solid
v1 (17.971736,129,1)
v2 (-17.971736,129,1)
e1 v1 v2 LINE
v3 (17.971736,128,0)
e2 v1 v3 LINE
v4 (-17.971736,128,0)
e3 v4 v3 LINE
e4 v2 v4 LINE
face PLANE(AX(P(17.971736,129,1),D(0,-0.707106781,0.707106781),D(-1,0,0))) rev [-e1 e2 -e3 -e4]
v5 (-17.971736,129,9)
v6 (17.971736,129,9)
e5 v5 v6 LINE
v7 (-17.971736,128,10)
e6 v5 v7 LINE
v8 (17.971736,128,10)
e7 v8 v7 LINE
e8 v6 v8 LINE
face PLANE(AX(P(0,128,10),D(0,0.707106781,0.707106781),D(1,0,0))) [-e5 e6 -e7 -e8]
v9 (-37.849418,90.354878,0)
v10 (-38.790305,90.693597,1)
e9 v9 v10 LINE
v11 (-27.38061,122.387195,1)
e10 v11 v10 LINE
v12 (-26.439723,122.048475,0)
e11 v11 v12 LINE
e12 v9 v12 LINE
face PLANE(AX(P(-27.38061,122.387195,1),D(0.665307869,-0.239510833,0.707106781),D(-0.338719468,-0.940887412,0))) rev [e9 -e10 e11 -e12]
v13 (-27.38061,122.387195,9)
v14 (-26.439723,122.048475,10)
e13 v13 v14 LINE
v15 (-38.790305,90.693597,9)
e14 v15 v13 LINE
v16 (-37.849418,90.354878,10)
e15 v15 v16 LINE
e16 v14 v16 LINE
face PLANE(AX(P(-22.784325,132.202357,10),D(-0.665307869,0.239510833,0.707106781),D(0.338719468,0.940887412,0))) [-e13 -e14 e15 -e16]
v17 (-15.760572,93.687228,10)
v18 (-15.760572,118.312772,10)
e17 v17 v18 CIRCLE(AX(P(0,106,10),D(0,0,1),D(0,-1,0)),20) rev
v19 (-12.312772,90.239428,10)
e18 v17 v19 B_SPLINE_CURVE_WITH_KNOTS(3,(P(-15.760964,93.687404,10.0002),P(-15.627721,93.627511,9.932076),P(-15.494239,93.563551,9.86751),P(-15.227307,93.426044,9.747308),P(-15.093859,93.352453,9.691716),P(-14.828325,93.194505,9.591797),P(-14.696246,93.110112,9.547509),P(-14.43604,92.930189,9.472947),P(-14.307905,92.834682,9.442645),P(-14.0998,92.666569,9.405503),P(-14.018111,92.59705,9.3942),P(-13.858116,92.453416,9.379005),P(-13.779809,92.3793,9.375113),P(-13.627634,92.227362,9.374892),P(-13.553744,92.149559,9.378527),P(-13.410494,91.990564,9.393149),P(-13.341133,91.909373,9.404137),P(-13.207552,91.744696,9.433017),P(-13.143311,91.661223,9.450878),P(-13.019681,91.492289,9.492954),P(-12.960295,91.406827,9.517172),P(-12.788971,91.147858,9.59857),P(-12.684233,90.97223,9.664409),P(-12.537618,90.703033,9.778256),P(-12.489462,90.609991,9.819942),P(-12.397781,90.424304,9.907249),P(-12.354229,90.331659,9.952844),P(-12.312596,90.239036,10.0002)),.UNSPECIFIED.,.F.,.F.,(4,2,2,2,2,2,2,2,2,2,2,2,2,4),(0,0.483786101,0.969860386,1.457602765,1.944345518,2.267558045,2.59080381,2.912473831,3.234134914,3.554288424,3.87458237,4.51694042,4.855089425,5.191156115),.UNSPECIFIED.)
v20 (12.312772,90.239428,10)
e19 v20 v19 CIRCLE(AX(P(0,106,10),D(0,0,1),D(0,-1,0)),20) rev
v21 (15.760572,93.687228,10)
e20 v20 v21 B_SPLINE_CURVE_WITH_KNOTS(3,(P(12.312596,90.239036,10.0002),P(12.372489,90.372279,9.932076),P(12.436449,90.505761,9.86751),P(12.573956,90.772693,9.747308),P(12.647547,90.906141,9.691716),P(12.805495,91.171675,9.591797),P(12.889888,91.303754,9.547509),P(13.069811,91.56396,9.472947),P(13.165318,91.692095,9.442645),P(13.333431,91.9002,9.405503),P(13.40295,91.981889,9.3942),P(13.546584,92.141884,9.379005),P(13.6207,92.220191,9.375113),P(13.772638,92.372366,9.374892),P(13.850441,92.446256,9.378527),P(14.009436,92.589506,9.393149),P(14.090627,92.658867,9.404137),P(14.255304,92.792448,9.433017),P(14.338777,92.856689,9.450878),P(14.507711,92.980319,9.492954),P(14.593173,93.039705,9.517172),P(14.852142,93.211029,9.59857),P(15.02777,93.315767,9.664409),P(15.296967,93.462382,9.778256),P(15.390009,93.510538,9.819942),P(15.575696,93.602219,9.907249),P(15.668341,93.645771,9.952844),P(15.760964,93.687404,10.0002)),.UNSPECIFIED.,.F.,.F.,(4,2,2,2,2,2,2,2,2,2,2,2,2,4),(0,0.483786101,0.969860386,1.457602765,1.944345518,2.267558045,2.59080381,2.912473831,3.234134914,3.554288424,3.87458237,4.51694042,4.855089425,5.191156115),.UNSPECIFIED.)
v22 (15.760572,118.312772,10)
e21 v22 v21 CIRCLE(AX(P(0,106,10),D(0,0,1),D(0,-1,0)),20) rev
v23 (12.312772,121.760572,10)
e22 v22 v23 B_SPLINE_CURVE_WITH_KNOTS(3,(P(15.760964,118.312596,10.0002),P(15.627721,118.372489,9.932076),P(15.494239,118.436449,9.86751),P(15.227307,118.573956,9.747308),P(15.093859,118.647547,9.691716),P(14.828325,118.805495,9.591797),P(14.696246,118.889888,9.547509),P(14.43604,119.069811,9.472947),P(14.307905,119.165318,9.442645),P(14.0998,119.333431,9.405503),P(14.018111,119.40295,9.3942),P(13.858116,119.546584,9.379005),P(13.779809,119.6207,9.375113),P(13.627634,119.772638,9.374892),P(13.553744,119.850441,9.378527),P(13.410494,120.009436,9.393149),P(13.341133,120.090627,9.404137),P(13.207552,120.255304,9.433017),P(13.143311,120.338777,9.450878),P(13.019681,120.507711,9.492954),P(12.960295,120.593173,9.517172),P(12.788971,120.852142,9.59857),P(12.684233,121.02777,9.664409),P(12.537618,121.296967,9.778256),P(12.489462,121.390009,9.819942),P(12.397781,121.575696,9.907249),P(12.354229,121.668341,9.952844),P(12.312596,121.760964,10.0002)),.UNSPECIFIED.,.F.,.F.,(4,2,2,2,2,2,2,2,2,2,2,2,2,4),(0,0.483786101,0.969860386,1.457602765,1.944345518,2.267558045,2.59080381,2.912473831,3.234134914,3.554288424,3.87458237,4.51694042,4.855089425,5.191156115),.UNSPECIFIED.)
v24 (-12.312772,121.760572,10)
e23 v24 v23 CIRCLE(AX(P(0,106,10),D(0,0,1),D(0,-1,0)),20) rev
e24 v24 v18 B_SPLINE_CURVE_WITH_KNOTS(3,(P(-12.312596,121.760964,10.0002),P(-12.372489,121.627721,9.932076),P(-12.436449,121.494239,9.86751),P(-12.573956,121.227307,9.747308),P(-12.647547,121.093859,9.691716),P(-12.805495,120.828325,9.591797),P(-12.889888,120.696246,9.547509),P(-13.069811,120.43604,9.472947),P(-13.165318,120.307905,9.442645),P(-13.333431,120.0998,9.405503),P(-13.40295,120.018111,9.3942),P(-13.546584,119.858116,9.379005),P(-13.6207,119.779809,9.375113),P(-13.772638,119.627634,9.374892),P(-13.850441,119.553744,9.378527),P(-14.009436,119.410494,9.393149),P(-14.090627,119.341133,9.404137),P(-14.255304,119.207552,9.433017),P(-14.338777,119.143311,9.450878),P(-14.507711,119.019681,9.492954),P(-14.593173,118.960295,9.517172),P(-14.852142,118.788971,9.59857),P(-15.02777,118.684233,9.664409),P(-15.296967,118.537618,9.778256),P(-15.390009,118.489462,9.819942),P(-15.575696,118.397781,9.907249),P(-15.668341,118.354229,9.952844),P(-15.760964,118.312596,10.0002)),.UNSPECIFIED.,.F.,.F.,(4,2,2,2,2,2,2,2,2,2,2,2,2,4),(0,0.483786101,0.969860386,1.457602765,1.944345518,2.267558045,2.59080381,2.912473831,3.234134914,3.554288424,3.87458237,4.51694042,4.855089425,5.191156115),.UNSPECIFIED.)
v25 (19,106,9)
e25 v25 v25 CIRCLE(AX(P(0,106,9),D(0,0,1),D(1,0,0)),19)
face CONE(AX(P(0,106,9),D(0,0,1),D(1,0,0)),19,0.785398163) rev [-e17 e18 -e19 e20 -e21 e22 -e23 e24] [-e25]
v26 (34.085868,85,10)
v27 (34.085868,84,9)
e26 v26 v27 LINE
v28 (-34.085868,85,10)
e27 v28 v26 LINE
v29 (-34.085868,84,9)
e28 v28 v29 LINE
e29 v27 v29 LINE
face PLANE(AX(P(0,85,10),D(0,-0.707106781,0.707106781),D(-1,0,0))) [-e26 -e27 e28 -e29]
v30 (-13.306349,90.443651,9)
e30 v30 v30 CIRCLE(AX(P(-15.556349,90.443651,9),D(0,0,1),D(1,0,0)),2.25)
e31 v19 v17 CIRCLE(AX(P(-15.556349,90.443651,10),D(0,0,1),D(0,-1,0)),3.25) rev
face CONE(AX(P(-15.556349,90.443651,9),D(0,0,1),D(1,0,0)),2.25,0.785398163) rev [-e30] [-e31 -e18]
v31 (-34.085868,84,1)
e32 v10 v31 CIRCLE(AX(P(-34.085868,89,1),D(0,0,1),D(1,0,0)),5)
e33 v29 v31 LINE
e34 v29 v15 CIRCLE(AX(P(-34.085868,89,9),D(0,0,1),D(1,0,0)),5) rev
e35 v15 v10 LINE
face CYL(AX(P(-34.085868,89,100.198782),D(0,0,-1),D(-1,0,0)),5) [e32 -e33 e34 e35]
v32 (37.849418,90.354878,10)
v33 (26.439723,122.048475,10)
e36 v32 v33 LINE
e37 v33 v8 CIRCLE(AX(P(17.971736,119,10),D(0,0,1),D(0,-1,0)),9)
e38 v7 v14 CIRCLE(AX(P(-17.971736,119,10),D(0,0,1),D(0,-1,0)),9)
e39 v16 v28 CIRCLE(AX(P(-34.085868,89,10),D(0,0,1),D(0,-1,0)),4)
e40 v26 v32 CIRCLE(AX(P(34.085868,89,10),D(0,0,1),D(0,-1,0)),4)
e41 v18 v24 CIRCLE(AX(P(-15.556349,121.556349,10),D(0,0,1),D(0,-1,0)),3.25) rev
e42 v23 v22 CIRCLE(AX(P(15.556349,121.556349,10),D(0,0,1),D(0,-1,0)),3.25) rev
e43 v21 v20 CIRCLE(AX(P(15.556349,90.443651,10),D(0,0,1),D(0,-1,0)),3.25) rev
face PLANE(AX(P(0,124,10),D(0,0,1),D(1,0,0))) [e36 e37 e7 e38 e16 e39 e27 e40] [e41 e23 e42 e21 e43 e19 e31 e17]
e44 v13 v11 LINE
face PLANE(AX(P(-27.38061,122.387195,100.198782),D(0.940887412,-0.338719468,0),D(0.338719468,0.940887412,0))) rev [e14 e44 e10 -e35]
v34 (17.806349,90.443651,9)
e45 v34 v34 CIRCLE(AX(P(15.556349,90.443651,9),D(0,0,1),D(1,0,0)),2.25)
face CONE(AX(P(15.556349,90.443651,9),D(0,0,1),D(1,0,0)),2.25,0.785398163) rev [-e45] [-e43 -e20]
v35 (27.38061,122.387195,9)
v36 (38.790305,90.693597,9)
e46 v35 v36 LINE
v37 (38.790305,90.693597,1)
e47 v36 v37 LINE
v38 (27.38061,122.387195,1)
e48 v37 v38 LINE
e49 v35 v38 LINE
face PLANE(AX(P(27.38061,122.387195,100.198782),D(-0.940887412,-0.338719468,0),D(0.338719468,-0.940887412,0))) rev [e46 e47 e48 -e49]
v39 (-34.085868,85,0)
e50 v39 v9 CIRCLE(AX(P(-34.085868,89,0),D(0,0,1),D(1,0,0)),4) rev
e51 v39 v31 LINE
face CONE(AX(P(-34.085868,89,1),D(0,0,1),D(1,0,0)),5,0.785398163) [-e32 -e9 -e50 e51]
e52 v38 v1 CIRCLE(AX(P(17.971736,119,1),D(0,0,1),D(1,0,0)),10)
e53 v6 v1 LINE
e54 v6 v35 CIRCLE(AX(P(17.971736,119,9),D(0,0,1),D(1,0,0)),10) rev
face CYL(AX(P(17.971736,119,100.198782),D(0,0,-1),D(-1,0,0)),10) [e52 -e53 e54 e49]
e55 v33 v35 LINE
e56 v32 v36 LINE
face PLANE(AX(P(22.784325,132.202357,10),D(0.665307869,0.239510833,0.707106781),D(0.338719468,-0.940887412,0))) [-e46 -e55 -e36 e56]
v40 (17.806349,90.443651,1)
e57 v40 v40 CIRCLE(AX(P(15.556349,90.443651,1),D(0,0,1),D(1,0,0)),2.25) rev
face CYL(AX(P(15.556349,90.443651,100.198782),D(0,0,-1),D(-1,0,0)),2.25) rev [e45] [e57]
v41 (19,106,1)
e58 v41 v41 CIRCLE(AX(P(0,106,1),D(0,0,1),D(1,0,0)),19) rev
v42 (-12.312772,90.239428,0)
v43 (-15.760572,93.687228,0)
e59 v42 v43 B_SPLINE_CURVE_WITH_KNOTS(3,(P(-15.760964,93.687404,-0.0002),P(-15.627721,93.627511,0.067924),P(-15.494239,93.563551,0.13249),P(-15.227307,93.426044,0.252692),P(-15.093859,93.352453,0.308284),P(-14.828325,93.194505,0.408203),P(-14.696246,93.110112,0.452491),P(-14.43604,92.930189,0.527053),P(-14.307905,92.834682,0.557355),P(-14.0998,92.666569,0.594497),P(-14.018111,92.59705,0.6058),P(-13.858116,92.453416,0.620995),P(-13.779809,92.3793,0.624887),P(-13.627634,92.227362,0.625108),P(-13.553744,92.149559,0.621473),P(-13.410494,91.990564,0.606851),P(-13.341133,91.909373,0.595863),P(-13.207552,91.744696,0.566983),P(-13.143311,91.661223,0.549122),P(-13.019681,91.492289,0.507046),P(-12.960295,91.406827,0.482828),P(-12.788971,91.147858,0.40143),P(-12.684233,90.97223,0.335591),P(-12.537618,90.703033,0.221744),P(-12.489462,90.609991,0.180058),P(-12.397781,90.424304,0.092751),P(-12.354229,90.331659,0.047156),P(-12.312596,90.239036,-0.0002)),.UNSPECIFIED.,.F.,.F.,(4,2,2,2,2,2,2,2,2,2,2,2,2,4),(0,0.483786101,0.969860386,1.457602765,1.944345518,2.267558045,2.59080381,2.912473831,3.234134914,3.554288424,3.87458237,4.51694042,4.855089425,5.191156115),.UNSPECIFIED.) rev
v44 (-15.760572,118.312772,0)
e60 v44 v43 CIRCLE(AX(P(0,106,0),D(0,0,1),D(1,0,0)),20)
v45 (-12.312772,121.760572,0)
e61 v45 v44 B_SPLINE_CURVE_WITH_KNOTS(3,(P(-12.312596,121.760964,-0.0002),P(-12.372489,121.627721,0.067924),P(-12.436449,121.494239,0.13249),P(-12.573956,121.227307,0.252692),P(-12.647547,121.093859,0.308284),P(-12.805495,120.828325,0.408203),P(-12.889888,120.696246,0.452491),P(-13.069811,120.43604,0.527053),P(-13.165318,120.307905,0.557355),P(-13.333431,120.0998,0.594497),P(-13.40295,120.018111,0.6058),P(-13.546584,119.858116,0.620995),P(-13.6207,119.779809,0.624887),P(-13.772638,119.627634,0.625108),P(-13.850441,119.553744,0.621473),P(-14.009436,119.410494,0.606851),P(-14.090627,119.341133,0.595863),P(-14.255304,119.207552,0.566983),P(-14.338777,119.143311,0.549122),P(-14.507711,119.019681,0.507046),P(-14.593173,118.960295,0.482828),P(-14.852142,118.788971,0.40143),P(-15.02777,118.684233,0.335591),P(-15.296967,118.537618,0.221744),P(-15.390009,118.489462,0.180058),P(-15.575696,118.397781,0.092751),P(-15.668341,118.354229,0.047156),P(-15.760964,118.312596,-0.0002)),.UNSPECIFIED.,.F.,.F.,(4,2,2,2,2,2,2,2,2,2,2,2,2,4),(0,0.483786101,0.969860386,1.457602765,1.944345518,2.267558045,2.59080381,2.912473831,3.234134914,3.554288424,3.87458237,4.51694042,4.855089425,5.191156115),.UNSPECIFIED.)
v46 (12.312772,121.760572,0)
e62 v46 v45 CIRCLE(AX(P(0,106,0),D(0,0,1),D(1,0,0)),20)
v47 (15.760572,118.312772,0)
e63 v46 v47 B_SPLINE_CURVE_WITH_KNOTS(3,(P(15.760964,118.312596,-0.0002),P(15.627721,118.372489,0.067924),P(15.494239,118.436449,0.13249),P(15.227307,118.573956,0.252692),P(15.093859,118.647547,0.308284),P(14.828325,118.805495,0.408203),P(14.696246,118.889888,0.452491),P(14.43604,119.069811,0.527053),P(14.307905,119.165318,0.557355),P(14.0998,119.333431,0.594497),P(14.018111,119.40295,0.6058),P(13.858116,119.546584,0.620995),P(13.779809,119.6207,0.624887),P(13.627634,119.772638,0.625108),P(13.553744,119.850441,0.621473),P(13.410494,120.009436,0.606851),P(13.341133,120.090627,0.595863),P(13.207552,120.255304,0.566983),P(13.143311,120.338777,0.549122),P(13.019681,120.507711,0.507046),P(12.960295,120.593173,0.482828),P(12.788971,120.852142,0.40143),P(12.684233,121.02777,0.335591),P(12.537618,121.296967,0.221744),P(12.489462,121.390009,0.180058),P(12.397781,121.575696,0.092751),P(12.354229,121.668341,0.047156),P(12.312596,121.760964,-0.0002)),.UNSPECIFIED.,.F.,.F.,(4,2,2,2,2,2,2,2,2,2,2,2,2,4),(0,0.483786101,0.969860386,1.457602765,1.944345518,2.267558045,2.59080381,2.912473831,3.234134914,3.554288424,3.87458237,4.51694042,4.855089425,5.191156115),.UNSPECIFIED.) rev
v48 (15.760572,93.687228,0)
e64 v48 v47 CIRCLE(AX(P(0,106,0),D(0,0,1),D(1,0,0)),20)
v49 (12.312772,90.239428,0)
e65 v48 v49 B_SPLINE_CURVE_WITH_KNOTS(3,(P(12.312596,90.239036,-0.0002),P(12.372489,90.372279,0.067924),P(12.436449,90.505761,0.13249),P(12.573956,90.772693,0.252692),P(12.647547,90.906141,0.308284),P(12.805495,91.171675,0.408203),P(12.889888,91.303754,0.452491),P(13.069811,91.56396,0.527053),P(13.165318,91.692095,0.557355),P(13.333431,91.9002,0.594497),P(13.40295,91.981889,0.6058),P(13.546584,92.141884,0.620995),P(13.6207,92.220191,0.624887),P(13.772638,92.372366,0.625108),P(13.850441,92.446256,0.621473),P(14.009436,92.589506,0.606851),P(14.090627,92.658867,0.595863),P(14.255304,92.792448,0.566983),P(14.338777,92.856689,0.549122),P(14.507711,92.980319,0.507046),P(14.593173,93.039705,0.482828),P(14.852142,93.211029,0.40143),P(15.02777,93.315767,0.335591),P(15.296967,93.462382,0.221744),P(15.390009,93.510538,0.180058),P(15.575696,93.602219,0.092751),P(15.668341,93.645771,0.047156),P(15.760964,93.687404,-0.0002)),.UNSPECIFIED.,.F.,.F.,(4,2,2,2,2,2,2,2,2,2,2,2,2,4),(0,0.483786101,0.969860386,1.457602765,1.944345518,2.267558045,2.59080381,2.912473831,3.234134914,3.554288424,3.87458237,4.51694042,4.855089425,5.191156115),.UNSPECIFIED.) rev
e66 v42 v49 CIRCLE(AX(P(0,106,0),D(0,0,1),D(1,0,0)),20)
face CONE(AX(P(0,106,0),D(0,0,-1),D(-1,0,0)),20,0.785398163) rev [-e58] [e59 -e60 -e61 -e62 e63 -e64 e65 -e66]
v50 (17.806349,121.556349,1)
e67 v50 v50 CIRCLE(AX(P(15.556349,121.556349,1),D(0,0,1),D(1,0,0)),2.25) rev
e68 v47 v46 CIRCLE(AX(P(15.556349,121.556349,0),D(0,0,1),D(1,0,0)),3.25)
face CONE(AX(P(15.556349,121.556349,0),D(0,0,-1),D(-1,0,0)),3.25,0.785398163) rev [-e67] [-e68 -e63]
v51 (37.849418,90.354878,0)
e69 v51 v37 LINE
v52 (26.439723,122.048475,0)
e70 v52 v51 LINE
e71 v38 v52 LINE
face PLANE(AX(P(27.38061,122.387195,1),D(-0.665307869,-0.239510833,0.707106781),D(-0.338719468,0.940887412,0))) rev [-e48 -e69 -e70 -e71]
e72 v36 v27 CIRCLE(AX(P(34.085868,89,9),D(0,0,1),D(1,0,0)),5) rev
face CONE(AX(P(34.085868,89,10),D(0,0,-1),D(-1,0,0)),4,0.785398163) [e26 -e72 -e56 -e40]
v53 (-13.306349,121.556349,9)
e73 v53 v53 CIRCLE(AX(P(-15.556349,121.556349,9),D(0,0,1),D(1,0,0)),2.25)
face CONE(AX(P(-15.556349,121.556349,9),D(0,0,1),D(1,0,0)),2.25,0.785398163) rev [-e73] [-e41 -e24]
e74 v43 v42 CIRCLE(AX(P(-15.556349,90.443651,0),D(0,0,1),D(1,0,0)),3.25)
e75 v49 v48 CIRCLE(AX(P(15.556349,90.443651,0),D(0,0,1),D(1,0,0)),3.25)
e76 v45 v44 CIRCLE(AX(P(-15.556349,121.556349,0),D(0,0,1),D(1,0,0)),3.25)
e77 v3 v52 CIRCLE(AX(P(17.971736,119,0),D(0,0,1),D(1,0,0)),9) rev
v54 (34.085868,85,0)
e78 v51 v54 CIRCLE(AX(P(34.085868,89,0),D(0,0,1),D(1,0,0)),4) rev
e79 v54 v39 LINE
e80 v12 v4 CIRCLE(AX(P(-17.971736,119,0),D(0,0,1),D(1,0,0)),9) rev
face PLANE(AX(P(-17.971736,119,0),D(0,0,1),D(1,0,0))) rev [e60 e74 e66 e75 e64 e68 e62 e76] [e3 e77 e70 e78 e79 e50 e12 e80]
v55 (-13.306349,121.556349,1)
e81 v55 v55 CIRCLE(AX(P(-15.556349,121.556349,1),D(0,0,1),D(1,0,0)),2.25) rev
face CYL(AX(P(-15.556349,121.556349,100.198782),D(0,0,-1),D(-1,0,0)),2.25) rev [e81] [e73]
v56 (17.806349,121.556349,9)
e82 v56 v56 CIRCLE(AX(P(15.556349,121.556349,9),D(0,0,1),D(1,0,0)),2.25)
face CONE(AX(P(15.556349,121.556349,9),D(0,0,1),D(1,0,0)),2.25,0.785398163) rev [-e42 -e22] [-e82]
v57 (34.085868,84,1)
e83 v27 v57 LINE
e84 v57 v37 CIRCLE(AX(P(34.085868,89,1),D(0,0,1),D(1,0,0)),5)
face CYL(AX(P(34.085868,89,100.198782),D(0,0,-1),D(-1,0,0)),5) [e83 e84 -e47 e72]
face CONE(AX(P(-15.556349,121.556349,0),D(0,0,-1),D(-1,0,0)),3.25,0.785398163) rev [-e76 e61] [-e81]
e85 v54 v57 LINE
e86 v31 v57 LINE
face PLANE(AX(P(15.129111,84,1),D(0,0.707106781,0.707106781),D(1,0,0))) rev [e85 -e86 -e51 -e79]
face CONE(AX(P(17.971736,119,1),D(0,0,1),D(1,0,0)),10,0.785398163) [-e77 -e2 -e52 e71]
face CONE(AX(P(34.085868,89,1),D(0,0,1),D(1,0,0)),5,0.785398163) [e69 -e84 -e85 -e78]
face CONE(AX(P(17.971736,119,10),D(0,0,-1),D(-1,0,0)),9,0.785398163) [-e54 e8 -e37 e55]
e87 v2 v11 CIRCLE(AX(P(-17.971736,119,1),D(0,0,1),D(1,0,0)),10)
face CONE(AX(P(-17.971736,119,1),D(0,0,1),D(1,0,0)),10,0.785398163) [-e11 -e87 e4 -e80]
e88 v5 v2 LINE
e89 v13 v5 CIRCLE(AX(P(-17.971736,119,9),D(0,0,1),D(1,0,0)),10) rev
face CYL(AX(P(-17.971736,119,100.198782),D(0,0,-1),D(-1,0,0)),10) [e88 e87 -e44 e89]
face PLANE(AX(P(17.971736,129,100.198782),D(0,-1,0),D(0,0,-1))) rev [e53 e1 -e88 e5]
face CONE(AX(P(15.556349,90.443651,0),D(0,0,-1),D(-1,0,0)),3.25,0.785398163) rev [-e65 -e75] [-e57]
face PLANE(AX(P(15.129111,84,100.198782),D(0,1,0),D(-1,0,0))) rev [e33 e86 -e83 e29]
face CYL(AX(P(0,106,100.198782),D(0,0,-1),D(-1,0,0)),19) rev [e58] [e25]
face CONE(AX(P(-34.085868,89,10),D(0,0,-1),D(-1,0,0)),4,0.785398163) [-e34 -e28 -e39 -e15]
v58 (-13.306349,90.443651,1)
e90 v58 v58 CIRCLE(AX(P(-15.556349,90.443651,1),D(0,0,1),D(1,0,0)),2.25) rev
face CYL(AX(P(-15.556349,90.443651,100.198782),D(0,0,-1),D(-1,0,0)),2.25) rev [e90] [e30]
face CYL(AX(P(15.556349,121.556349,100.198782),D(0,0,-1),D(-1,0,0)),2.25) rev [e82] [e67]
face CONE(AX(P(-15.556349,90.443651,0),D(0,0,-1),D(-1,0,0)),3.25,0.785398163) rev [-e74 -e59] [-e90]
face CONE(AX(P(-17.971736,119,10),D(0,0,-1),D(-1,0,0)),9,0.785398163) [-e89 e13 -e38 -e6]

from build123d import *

# Parameters (mm, degrees)
SKETCH1_R           = 19
SKETCH1_R_2         = 2.25
BOSS_EXTRUDE1_DEPTH = 10
CHAMFER1_SIZE       = 1


with BuildPart() as part:
    # Sketch1 → Boss-Extrude1 (new body)
    with BuildSketch(Plane.XY):
        with BuildLine():
            Line((-27.380609914, 122.387194683), (-38.790304957, 90.693597341))
            ThreePointArc((-38.790304957, 90.693597341), (-38.176588293, 86.124933627), (-34.085867898, 84))
            Line((-34.085867898, 84), (-15.12911101, 84))
            Line((-15.12911101, 84), (15.12911101, 84))
            Line((15.12911101, 84), (34.085867898, 84))
            ThreePointArc((34.085867898, 84), (38.176588293, 86.124933627), (38.790304957, 90.693597341))
            Line((38.790304957, 90.693597341), (27.380609914, 122.387194683))
            ThreePointArc((27.380609914, 122.387194683), (23.721868541, 127.181440791), (17.971735796, 129))
            Line((17.971735796, 129), (-17.971735796, 129))
            ThreePointArc((-17.971735796, 129), (-23.721868541, 127.181440791), (-27.380609914, 122.387194683))
        make_face()
        with Locations(Location((0, 106, 0), (0, 0, 270))):
            Circle(SKETCH1_R, mode=Mode.SUBTRACT)
        with Locations(Location((15.556349182, 90.443650818, 0), (0, 0, 270))):
            Circle(SKETCH1_R_2, mode=Mode.SUBTRACT)
        with Locations(Location((-15.556349182, 90.443650818, 0), (0, 0, 270))):
            Circle(SKETCH1_R_2, mode=Mode.SUBTRACT)
        with Locations(Location((15.556349182, 121.556349182, 0), (0, 0, 270))):
            Circle(SKETCH1_R_2, mode=Mode.SUBTRACT)
        with Locations(Location((-15.556349182, 121.556349182, 0), (0, 0, 270))):
            Circle(SKETCH1_R_2, mode=Mode.SUBTRACT)
    extrude(amount=BOSS_EXTRUDE1_DEPTH)

    # Chamfer1
    # the kernel refuses this chamfer: 1 mm, written as the material it takes off along each edge
    with BuildSketch(Plane(origin=(17.971735796, 129, 0), x_dir=(0, 0.027495876610582174, 0.9996219169112968), z_dir=(-1, 0, 0)), Plane(origin=(17.971735796, 129, 10), x_dir=(0, -0.9996219169112968, 0.02749587661058574), z_dir=(-1, 0, 0))) as chamfer1_piece_1:
        Polygon((CHAMFER1_SIZE * 0.999621916911, -CHAMFER1_SIZE * 0.0274958766106), (-CHAMFER1_SIZE * 0.0274958766106, -CHAMFER1_SIZE * 0.999621916911), (0, 0), align=None)
    extrude(amount=35.943471591, mode=Mode.SUBTRACT)
    with BuildSketch(Plane(origin=(17.971735796, 119, 0), x_dir=(0.9408874118687268, 0.33871946827274174, 0), z_dir=(0.33871946827274174, -0.9408874118687268, 0))) as chamfer1_piece_2:
        Polygon((10, CHAMFER1_SIZE), (10 - CHAMFER1_SIZE, 0), (10, 0), align=None)
    revolve(axis=Axis((17.971735796, 119, 0), (0, 0, 1)), revolution_arc=70.201123645, mode=Mode.SUBTRACT)
    with BuildSketch(Plane(origin=(38.790304957, 90.693597341, 0), x_dir=(0.025870524181196484, 0.009313388705230746, 0.9996219169112968), z_dir=(-0.3387194682727421, 0.9408874118687267, 0)), Plane(origin=(-27.380609914, 122.387194683, 0), x_dir=(-0.025870524181196484, 0.00931338870523073, 0.9996219169112968), z_dir=(-0.3387194682727416, -0.9408874118687268, 0)), Plane(origin=(38.790304957, 90.693597341, 10), x_dir=(-0.9405316782499255, -0.33859140416997363, 0.027495876610585557), z_dir=(-0.3387194682727421, 0.9408874118687267, 0))) as chamfer1_piece_3:
        Polygon((CHAMFER1_SIZE * 0.999621916911, -CHAMFER1_SIZE * 0.0274958766106), (-CHAMFER1_SIZE * 0.0274958766106, -CHAMFER1_SIZE * 0.999621916911), (0, 0), align=None)
    extrude(amount=33.684792613, mode=Mode.SUBTRACT)
    with BuildSketch(Plane(origin=(34.085867898, 89, 0), x_dir=(0, -1, 0), z_dir=(-1, 0, 0))) as chamfer1_piece_4:
        Polygon((5, CHAMFER1_SIZE), (5 - CHAMFER1_SIZE, 0), (5, 0), align=None)
    revolve(axis=Axis((34.085867898, 89, 0), (0, 0, 1)), revolution_arc=109.798876355, mode=Mode.SUBTRACT)
    with BuildSketch(Plane(origin=(-34.085867898, 84, 0), x_dir=(0, -0.027495876610582174, 0.9996219169112968), z_dir=(1, 0, 0))) as chamfer1_piece_5:
        Polygon((CHAMFER1_SIZE * 0.999621916911, -CHAMFER1_SIZE * 0.0274958766106), (-CHAMFER1_SIZE * 0.0274958766106, -CHAMFER1_SIZE * 0.999621916911), (0, 0), align=None)
    extrude(amount=68.171735796, mode=Mode.SUBTRACT)
    with BuildSketch(Plane(origin=(-34.085867898, 89, 0), x_dir=(-0.9408874118687287, 0.33871946827273663, 0), z_dir=(0.33871946827273663, 0.9408874118687287, 0))) as chamfer1_piece_6:
        Polygon((5 - CHAMFER1_SIZE, 0), (5, CHAMFER1_SIZE), (5, 0), align=None)
    revolve(axis=Axis((-34.085867898, 89, 0), (0, 0, 1)), revolution_arc=109.798876355, mode=Mode.SUBTRACT)
    with BuildSketch(Plane(origin=(-17.971735796, 119, 0), x_dir=(0, 1, 0), z_dir=(1, 0, 0))) as chamfer1_piece_7:
        Polygon((10 - CHAMFER1_SIZE, 0), (10, CHAMFER1_SIZE), (10, 0), align=None)
    revolve(axis=Axis((-17.971735796, 119, 0), (0, 0, 1)), revolution_arc=70.201123645, mode=Mode.SUBTRACT)
    with BuildSketch(Plane(origin=(0, 106, 0), x_dir=(0, -1, 0), z_dir=(-1, 0, 0))) as chamfer1_piece_8:
        Polygon((19, CHAMFER1_SIZE), (19 + CHAMFER1_SIZE, 0), (19, 0), align=None)
    revolve(axis=Axis((0, 106, 0), (0, 0, 1)), mode=Mode.SUBTRACT)
    with BuildSketch(Plane(origin=(15.556349182, 90.443650818, 0), x_dir=(0, -1, 0), z_dir=(-1, 0, 0))) as chamfer1_piece_9:
        Polygon((2.25, CHAMFER1_SIZE), (2.25 + CHAMFER1_SIZE, 0), (2.25, 0), align=None)
    revolve(axis=Axis((15.556349182, 90.443650818, 0), (0, 0, 1)), mode=Mode.SUBTRACT)
    with BuildSketch(Plane(origin=(-15.556349182, 90.443650818, 0), x_dir=(0, -1, 0), z_dir=(-1, 0, 0))) as chamfer1_piece_10:
        Polygon((2.25, CHAMFER1_SIZE), (2.25 + CHAMFER1_SIZE, 0), (2.25, 0), align=None)
    revolve(axis=Axis((-15.556349182, 90.443650818, 0), (0, 0, 1)), mode=Mode.SUBTRACT)
    with BuildSketch(Plane(origin=(15.556349182, 121.556349182, 0), x_dir=(0, -1, 0), z_dir=(-1, 0, 0))) as chamfer1_piece_11:
        Polygon((2.25, CHAMFER1_SIZE), (2.25 + CHAMFER1_SIZE, 0), (2.25, 0), align=None)
    revolve(axis=Axis((15.556349182, 121.556349182, 0), (0, 0, 1)), mode=Mode.SUBTRACT)
    with BuildSketch(Plane(origin=(-15.556349182, 121.556349182, 0), x_dir=(0, -1, 0), z_dir=(-1, 0, 0))) as chamfer1_piece_12:
        Polygon((2.25, CHAMFER1_SIZE), (2.25 + CHAMFER1_SIZE, 0), (2.25, 0), align=None)
    revolve(axis=Axis((-15.556349182, 121.556349182, 0), (0, 0, 1)), mode=Mode.SUBTRACT)
    with BuildSketch(Plane(origin=(-17.971735796, 119, 10), x_dir=(0, 1, 0), z_dir=(1, 0, 0))) as chamfer1_piece_13:
        Polygon((10 - CHAMFER1_SIZE, 0), (10, -CHAMFER1_SIZE), (10, 0), align=None)
    revolve(axis=Axis((-17.971735796, 119, 10), (0, 0, 1)), revolution_arc=70.201123645, mode=Mode.SUBTRACT)
    with BuildSketch(Plane(origin=(-27.380609914, 122.387194683, 10), x_dir=(-0.025870524181196505, 0.009313388705230739, -0.9996219169112968), z_dir=(-0.3387194682727416, -0.9408874118687268, 0))) as chamfer1_piece_14:
        Polygon((CHAMFER1_SIZE * 0.999621916911, CHAMFER1_SIZE * 0.0274958766106), (-CHAMFER1_SIZE * 0.0274958766106, CHAMFER1_SIZE * 0.999621916911), (0, 0), align=None)
    extrude(amount=33.684792613, mode=Mode.SUBTRACT)
    with BuildSketch(Plane(origin=(-34.085867898, 89, 10), x_dir=(-0.9408874118687287, 0.33871946827273663, 0), z_dir=(0.33871946827273663, 0.9408874118687287, 0))) as chamfer1_piece_15:
        Polygon((5 - CHAMFER1_SIZE, 0), (5, -CHAMFER1_SIZE), (5, 0), align=None)
    revolve(axis=Axis((-34.085867898, 89, 10), (0, 0, 1)), revolution_arc=109.798876355, mode=Mode.SUBTRACT)
    with BuildSketch(Plane(origin=(34.085867898, 84, 10), x_dir=(0, 0.9996219169112968, 0.02749587661058574), z_dir=(-1, 0, 0))) as chamfer1_piece_16:
        Polygon((CHAMFER1_SIZE * 0.999621916911, CHAMFER1_SIZE * 0.0274958766106), (-CHAMFER1_SIZE * 0.0274958766106, CHAMFER1_SIZE * 0.999621916911), (0, 0), align=None)
    extrude(amount=68.171735796, mode=Mode.SUBTRACT)
    with BuildSketch(Plane(origin=(34.085867898, 89, 10), x_dir=(0, -1, 0), z_dir=(-1, 0, 0))) as chamfer1_piece_17:
        Polygon((5 - CHAMFER1_SIZE, 0), (5, -CHAMFER1_SIZE), (5, 0), align=None)
    revolve(axis=Axis((34.085867898, 89, 10), (0, 0, 1)), revolution_arc=109.798876355, mode=Mode.SUBTRACT)
    with BuildSketch(Plane(origin=(17.971735796, 119, 10), x_dir=(0.9408874118687268, 0.33871946827274174, 0), z_dir=(0.33871946827274174, -0.9408874118687268, 0))) as chamfer1_piece_18:
        Polygon((10 - CHAMFER1_SIZE, 0), (10, -CHAMFER1_SIZE), (10, 0), align=None)
    revolve(axis=Axis((17.971735796, 119, 10), (0, 0, 1)), revolution_arc=70.201123645, mode=Mode.SUBTRACT)
    with BuildSketch(Plane(origin=(0, 106, 10), x_dir=(0, -1, 0), z_dir=(-1, 0, 0))) as chamfer1_piece_19:
        Polygon((19 + CHAMFER1_SIZE, 0), (19, -CHAMFER1_SIZE), (19, 0), align=None)
    revolve(axis=Axis((0, 106, 10), (0, 0, 1)), mode=Mode.SUBTRACT)
    with BuildSketch(Plane(origin=(15.556349182, 90.443650818, 10), x_dir=(0, -1, 0), z_dir=(-1, 0, 0))) as chamfer1_piece_20:
        Polygon((2.25 + CHAMFER1_SIZE, 0), (2.25, -CHAMFER1_SIZE), (2.25, 0), align=None)
    revolve(axis=Axis((15.556349182, 90.443650818, 10), (0, 0, 1)), mode=Mode.SUBTRACT)
    with BuildSketch(Plane(origin=(-15.556349182, 90.443650818, 10), x_dir=(0, -1, 0), z_dir=(-1, 0, 0))) as chamfer1_piece_21:
        Polygon((2.25 + CHAMFER1_SIZE, 0), (2.25, -CHAMFER1_SIZE), (2.25, 0), align=None)
    revolve(axis=Axis((-15.556349182, 90.443650818, 10), (0, 0, 1)), mode=Mode.SUBTRACT)
    with BuildSketch(Plane(origin=(15.556349182, 121.556349182, 10), x_dir=(0, -1, 0), z_dir=(-1, 0, 0))) as chamfer1_piece_22:
        Polygon((2.25 + CHAMFER1_SIZE, 0), (2.25, -CHAMFER1_SIZE), (2.25, 0), align=None)
    revolve(axis=Axis((15.556349182, 121.556349182, 10), (0, 0, 1)), mode=Mode.SUBTRACT)
    with BuildSketch(Plane(origin=(-15.556349182, 121.556349182, 10), x_dir=(0, -1, 0), z_dir=(-1, 0, 0))) as chamfer1_piece_23:
        Polygon((2.25 + CHAMFER1_SIZE, 0), (2.25, -CHAMFER1_SIZE), (2.25, 0), align=None)
    revolve(axis=Axis((-15.556349182, 121.556349182, 10), (0, 0, 1)), mode=Mode.SUBTRACT)


solid = part.part
